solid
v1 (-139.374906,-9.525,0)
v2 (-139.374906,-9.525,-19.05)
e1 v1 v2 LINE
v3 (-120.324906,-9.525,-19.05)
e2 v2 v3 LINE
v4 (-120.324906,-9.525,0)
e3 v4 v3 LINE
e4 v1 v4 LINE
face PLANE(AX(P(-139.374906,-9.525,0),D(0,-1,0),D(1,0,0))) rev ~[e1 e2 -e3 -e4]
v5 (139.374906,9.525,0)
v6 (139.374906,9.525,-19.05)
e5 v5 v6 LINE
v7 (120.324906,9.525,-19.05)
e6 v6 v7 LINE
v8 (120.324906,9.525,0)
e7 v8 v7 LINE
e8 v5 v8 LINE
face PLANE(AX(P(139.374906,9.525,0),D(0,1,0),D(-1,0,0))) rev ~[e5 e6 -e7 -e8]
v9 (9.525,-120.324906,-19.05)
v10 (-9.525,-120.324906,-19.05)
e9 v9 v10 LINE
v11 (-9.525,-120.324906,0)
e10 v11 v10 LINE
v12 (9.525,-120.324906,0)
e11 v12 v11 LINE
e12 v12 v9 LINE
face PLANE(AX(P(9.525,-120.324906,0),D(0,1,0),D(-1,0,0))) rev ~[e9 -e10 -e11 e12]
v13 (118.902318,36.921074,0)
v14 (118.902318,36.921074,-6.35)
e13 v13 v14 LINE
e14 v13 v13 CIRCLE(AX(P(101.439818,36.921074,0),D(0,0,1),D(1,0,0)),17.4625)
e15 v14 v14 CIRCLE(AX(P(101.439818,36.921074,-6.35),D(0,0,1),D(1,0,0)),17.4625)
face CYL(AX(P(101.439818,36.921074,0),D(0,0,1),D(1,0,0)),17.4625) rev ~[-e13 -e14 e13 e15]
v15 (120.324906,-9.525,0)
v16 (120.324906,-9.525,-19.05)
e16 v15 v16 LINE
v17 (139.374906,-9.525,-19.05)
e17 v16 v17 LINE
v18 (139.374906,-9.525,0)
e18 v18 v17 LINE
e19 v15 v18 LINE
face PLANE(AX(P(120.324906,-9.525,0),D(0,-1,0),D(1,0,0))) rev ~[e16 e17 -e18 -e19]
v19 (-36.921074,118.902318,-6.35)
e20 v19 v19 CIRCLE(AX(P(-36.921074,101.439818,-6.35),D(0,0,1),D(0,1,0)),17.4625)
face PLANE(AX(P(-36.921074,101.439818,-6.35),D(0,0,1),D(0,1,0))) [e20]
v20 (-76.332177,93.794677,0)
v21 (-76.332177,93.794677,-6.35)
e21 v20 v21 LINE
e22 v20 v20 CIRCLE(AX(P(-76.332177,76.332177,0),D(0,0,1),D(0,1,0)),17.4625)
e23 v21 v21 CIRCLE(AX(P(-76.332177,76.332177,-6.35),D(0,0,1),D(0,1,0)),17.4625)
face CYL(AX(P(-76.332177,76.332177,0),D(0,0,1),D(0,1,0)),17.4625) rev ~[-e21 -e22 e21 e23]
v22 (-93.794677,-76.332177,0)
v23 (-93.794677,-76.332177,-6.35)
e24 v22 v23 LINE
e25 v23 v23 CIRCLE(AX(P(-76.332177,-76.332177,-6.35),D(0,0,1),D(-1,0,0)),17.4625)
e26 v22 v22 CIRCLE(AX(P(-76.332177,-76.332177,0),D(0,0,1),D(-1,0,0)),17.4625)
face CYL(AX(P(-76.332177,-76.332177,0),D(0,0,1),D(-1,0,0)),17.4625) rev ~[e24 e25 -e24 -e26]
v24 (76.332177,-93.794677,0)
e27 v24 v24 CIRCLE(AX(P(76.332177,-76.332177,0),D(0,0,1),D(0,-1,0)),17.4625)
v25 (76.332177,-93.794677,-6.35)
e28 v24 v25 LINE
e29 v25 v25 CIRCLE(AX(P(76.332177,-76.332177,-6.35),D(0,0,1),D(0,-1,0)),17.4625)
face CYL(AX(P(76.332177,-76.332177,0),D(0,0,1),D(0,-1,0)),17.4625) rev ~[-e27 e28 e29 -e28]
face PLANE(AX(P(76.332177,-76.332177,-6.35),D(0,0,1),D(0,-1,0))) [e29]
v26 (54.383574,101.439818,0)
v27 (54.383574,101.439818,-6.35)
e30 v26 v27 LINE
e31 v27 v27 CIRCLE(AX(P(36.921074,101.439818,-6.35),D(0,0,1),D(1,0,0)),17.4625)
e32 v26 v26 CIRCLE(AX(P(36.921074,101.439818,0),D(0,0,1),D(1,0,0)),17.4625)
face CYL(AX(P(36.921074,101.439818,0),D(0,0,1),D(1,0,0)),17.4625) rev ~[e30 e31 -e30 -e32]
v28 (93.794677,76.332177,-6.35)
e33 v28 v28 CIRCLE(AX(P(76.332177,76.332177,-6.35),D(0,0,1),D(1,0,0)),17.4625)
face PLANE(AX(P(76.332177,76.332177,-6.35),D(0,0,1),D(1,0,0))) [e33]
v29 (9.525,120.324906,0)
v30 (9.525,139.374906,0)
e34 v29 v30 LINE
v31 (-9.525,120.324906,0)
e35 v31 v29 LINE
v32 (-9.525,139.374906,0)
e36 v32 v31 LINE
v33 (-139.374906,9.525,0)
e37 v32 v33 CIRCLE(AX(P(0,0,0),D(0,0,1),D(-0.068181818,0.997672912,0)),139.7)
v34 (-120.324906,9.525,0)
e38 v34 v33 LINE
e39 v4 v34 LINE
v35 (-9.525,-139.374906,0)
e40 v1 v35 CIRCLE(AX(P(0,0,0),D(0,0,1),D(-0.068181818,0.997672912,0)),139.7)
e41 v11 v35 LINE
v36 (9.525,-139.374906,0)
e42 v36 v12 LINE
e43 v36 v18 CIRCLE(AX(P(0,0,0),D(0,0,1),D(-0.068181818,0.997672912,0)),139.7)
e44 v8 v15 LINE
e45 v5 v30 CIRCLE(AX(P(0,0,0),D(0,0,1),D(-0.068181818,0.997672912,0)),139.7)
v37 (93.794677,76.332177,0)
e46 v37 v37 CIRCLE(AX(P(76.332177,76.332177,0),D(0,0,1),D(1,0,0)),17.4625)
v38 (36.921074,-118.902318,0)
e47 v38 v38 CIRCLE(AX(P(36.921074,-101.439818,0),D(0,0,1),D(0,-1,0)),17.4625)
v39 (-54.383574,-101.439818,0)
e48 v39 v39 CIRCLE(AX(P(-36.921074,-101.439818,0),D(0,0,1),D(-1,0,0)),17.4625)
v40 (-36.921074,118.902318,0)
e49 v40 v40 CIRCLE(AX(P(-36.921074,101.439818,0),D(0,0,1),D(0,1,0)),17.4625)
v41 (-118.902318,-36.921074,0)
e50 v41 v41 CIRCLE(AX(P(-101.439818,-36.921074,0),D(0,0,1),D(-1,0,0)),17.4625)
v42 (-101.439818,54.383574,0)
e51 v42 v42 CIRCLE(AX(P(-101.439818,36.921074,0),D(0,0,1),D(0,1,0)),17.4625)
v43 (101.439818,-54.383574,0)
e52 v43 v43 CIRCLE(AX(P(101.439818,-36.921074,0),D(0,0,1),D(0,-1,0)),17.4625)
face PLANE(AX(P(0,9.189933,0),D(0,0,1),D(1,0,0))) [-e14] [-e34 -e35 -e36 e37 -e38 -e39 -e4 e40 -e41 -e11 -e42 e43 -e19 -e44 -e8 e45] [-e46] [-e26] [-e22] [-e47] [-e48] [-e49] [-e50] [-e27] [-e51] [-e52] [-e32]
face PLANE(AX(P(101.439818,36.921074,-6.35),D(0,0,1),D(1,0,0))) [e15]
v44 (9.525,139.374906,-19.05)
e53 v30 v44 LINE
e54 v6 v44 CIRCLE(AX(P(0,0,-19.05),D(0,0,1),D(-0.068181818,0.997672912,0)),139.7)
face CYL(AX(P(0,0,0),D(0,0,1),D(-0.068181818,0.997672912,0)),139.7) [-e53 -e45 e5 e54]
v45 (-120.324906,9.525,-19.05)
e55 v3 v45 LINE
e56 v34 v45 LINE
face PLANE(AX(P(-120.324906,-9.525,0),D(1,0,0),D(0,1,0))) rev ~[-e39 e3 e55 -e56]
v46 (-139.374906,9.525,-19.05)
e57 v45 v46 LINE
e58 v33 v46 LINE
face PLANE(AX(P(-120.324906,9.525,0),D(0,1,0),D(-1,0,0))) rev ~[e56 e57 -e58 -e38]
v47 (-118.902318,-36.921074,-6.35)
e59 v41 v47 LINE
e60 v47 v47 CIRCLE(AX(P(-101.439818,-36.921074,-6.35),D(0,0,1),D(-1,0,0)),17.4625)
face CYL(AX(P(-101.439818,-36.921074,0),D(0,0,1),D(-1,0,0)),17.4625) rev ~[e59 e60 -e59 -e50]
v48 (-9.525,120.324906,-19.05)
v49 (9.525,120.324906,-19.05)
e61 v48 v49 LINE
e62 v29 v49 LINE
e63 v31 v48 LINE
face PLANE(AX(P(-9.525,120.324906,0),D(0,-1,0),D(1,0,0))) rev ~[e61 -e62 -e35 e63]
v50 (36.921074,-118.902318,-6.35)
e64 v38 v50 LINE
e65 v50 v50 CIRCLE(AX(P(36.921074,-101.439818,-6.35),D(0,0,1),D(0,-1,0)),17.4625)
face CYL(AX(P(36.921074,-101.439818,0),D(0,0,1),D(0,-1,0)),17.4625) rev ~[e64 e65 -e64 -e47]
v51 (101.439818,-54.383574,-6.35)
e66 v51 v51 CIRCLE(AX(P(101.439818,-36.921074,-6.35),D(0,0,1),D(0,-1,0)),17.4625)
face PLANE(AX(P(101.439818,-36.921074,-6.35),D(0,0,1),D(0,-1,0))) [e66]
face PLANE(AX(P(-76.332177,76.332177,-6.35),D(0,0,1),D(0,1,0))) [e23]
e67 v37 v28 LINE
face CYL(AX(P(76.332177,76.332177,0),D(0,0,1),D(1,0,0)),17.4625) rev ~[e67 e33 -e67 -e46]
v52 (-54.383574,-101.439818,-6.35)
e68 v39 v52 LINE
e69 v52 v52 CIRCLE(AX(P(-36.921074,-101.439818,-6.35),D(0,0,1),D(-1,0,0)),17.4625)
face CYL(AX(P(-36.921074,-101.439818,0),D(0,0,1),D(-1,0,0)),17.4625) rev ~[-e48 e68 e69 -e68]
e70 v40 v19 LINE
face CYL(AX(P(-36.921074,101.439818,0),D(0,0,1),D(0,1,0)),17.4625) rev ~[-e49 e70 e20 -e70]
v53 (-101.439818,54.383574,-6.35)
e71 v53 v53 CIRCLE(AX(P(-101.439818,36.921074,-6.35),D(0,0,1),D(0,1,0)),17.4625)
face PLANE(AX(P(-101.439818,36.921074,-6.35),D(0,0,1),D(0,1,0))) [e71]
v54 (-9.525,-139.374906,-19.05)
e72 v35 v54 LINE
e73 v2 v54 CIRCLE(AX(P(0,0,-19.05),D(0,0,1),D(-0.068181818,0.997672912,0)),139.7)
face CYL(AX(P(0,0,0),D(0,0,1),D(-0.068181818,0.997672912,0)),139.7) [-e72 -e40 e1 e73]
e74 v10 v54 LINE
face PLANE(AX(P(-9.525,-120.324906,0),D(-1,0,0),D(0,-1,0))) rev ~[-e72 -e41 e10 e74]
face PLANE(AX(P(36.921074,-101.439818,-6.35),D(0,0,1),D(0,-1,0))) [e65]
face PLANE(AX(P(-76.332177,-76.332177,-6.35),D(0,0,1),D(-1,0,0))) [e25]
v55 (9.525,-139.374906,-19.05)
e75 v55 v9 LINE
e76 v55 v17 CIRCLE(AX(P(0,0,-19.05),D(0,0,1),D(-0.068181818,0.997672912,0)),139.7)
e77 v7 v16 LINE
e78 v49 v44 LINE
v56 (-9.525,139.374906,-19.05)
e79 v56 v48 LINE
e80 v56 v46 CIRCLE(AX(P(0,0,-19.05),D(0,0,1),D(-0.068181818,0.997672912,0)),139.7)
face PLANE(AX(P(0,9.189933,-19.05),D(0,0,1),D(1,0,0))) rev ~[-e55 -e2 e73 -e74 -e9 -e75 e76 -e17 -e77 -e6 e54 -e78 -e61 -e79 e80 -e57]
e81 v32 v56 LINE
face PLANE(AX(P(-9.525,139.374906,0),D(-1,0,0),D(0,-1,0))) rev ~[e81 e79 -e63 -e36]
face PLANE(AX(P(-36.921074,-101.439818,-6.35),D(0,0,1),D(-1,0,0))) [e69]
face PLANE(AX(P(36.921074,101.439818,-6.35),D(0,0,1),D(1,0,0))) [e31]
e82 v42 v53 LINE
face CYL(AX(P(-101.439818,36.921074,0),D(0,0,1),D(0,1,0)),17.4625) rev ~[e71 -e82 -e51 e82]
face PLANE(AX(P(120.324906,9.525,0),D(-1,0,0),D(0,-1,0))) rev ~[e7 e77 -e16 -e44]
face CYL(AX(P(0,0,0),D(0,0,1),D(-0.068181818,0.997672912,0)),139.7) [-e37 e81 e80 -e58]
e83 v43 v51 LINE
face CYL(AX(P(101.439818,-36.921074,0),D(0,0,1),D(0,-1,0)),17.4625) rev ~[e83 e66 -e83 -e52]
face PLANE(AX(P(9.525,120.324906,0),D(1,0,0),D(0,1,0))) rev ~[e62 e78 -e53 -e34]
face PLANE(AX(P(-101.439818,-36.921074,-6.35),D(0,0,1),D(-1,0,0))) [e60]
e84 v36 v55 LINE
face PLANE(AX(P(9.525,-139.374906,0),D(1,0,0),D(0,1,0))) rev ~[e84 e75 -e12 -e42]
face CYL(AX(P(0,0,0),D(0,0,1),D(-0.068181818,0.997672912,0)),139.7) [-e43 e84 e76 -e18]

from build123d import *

# Parameters (mm, degrees)
F0_R            = 17.4625
F0_W            = 19.05
F0_H            = 6.35
F1_DEPTH        = 19.05
F2_DEPTH        = 6.35
F2_COPIES_COUNT = 4
F3_DEPTH        = 19.051
F3_COPIES_COUNT = 4


# Not quite as in the source:
# - a pattern or mirror of a feature is missing from the dataset's text; its kind, count and spacing are read off the source's solid


with BuildPart() as f1:
    # F0 (on Top) → F1 (new body)
    with BuildSketch(Plane.XY):
        with BuildLine():
            ThreePointArc((-9.525, 139.3749058296), (-95.3557746023, -102.0948884617), (139.7, 0))
            ThreePointArc((139.7, 0), (102.0948884617, 95.3557746023), (9.525, 139.3749058296))
            Line((9.525, 139.3749058296), (9.525, 120.3249058296))
            Line((9.525, 120.3249058296), (9.525, 113.9749058296))
            Line((9.525, 113.9749058296), (-9.525, 113.9749058296))
            Line((-9.525, 113.9749058296), (-9.525, 120.3249058296))
            Line((-9.525, 120.3249058296), (-9.525, 139.3749058296))
        make_face()
        with Locations((101.4398184138, 36.921074472)):
            Circle(F0_R, mode=Mode.SUBTRACT)
        with Locations((36.921074472, 101.4398184138)):
            Circle(F0_R, mode=Mode.SUBTRACT)
        with Locations((76.3321770291, 76.3321770291)):
            Circle(F0_R, mode=Mode.SUBTRACT)
        with BuildLine():
            Line((9.525, 120.3249058296), (9.525, 139.3749058296))
            ThreePointArc((9.525, 139.3749058296), (0, 139.7), (-9.525, 139.3749058296))
            Line((-9.525, 139.3749058296), (-9.525, 120.3249058296))
            Line((-9.525, 120.3249058296), (9.525, 120.3249058296))
        make_face()
        with Locations((36.921074472, 101.4398184138)):
            Circle(F0_R)
        with Locations((76.3321770291, 76.3321770291)):
            Circle(F0_R)
        with Locations((101.4398184138, 36.921074472)):
            Circle(F0_R)
        with Locations((0, 117.1499058296)):
            Rectangle(F0_W, F0_H)
    extrude(amount=-F1_DEPTH)

    # F0 (on Top) → F2 (cut)
    with BuildSketch(Plane.XY):
        with Locations((36.921074472, 101.4398184138)):
            Circle(F0_R)
        with Locations((76.3321770291, 76.3321770291)):
            Circle(F0_R)
        with Locations((101.4398184138, 36.921074472)):
            Circle(F0_R)
    f2 = extrude(amount=-F2_DEPTH, mode=Mode.SUBTRACT)

    # F2_copies: F2 ×4 about axis
    f2_copies_axis = Axis((0, 0, 0), (0, 0, 1))
    for i in range(1, F2_COPIES_COUNT):
        add(f2.rotate(f2_copies_axis, i * 360 / F2_COPIES_COUNT), mode=Mode.SUBTRACT)

    # F0 (on Top) → F3 (cut, through all)
    with BuildSketch(Plane.XY):
        with BuildLine():
            Line((9.525, 120.3249058296), (9.525, 139.3749058296))
            ThreePointArc((9.525, 139.3749058296), (0, 139.7), (-9.525, 139.3749058296))
            Line((-9.525, 139.3749058296), (-9.525, 120.3249058296))
            Line((-9.525, 120.3249058296), (9.525, 120.3249058296))
        make_face()
    f3 = extrude(amount=-F3_DEPTH, mode=Mode.SUBTRACT)

    # F3_copies: F3 ×4 about axis
    f3_copies_axis = Axis((0, 0, 0), (0, 0, 1))
    for i in range(1, F3_COPIES_COUNT):
        add(f3.rotate(f3_copies_axis, i * 360 / F3_COPIES_COUNT), mode=Mode.SUBTRACT)


solid = f1.part
